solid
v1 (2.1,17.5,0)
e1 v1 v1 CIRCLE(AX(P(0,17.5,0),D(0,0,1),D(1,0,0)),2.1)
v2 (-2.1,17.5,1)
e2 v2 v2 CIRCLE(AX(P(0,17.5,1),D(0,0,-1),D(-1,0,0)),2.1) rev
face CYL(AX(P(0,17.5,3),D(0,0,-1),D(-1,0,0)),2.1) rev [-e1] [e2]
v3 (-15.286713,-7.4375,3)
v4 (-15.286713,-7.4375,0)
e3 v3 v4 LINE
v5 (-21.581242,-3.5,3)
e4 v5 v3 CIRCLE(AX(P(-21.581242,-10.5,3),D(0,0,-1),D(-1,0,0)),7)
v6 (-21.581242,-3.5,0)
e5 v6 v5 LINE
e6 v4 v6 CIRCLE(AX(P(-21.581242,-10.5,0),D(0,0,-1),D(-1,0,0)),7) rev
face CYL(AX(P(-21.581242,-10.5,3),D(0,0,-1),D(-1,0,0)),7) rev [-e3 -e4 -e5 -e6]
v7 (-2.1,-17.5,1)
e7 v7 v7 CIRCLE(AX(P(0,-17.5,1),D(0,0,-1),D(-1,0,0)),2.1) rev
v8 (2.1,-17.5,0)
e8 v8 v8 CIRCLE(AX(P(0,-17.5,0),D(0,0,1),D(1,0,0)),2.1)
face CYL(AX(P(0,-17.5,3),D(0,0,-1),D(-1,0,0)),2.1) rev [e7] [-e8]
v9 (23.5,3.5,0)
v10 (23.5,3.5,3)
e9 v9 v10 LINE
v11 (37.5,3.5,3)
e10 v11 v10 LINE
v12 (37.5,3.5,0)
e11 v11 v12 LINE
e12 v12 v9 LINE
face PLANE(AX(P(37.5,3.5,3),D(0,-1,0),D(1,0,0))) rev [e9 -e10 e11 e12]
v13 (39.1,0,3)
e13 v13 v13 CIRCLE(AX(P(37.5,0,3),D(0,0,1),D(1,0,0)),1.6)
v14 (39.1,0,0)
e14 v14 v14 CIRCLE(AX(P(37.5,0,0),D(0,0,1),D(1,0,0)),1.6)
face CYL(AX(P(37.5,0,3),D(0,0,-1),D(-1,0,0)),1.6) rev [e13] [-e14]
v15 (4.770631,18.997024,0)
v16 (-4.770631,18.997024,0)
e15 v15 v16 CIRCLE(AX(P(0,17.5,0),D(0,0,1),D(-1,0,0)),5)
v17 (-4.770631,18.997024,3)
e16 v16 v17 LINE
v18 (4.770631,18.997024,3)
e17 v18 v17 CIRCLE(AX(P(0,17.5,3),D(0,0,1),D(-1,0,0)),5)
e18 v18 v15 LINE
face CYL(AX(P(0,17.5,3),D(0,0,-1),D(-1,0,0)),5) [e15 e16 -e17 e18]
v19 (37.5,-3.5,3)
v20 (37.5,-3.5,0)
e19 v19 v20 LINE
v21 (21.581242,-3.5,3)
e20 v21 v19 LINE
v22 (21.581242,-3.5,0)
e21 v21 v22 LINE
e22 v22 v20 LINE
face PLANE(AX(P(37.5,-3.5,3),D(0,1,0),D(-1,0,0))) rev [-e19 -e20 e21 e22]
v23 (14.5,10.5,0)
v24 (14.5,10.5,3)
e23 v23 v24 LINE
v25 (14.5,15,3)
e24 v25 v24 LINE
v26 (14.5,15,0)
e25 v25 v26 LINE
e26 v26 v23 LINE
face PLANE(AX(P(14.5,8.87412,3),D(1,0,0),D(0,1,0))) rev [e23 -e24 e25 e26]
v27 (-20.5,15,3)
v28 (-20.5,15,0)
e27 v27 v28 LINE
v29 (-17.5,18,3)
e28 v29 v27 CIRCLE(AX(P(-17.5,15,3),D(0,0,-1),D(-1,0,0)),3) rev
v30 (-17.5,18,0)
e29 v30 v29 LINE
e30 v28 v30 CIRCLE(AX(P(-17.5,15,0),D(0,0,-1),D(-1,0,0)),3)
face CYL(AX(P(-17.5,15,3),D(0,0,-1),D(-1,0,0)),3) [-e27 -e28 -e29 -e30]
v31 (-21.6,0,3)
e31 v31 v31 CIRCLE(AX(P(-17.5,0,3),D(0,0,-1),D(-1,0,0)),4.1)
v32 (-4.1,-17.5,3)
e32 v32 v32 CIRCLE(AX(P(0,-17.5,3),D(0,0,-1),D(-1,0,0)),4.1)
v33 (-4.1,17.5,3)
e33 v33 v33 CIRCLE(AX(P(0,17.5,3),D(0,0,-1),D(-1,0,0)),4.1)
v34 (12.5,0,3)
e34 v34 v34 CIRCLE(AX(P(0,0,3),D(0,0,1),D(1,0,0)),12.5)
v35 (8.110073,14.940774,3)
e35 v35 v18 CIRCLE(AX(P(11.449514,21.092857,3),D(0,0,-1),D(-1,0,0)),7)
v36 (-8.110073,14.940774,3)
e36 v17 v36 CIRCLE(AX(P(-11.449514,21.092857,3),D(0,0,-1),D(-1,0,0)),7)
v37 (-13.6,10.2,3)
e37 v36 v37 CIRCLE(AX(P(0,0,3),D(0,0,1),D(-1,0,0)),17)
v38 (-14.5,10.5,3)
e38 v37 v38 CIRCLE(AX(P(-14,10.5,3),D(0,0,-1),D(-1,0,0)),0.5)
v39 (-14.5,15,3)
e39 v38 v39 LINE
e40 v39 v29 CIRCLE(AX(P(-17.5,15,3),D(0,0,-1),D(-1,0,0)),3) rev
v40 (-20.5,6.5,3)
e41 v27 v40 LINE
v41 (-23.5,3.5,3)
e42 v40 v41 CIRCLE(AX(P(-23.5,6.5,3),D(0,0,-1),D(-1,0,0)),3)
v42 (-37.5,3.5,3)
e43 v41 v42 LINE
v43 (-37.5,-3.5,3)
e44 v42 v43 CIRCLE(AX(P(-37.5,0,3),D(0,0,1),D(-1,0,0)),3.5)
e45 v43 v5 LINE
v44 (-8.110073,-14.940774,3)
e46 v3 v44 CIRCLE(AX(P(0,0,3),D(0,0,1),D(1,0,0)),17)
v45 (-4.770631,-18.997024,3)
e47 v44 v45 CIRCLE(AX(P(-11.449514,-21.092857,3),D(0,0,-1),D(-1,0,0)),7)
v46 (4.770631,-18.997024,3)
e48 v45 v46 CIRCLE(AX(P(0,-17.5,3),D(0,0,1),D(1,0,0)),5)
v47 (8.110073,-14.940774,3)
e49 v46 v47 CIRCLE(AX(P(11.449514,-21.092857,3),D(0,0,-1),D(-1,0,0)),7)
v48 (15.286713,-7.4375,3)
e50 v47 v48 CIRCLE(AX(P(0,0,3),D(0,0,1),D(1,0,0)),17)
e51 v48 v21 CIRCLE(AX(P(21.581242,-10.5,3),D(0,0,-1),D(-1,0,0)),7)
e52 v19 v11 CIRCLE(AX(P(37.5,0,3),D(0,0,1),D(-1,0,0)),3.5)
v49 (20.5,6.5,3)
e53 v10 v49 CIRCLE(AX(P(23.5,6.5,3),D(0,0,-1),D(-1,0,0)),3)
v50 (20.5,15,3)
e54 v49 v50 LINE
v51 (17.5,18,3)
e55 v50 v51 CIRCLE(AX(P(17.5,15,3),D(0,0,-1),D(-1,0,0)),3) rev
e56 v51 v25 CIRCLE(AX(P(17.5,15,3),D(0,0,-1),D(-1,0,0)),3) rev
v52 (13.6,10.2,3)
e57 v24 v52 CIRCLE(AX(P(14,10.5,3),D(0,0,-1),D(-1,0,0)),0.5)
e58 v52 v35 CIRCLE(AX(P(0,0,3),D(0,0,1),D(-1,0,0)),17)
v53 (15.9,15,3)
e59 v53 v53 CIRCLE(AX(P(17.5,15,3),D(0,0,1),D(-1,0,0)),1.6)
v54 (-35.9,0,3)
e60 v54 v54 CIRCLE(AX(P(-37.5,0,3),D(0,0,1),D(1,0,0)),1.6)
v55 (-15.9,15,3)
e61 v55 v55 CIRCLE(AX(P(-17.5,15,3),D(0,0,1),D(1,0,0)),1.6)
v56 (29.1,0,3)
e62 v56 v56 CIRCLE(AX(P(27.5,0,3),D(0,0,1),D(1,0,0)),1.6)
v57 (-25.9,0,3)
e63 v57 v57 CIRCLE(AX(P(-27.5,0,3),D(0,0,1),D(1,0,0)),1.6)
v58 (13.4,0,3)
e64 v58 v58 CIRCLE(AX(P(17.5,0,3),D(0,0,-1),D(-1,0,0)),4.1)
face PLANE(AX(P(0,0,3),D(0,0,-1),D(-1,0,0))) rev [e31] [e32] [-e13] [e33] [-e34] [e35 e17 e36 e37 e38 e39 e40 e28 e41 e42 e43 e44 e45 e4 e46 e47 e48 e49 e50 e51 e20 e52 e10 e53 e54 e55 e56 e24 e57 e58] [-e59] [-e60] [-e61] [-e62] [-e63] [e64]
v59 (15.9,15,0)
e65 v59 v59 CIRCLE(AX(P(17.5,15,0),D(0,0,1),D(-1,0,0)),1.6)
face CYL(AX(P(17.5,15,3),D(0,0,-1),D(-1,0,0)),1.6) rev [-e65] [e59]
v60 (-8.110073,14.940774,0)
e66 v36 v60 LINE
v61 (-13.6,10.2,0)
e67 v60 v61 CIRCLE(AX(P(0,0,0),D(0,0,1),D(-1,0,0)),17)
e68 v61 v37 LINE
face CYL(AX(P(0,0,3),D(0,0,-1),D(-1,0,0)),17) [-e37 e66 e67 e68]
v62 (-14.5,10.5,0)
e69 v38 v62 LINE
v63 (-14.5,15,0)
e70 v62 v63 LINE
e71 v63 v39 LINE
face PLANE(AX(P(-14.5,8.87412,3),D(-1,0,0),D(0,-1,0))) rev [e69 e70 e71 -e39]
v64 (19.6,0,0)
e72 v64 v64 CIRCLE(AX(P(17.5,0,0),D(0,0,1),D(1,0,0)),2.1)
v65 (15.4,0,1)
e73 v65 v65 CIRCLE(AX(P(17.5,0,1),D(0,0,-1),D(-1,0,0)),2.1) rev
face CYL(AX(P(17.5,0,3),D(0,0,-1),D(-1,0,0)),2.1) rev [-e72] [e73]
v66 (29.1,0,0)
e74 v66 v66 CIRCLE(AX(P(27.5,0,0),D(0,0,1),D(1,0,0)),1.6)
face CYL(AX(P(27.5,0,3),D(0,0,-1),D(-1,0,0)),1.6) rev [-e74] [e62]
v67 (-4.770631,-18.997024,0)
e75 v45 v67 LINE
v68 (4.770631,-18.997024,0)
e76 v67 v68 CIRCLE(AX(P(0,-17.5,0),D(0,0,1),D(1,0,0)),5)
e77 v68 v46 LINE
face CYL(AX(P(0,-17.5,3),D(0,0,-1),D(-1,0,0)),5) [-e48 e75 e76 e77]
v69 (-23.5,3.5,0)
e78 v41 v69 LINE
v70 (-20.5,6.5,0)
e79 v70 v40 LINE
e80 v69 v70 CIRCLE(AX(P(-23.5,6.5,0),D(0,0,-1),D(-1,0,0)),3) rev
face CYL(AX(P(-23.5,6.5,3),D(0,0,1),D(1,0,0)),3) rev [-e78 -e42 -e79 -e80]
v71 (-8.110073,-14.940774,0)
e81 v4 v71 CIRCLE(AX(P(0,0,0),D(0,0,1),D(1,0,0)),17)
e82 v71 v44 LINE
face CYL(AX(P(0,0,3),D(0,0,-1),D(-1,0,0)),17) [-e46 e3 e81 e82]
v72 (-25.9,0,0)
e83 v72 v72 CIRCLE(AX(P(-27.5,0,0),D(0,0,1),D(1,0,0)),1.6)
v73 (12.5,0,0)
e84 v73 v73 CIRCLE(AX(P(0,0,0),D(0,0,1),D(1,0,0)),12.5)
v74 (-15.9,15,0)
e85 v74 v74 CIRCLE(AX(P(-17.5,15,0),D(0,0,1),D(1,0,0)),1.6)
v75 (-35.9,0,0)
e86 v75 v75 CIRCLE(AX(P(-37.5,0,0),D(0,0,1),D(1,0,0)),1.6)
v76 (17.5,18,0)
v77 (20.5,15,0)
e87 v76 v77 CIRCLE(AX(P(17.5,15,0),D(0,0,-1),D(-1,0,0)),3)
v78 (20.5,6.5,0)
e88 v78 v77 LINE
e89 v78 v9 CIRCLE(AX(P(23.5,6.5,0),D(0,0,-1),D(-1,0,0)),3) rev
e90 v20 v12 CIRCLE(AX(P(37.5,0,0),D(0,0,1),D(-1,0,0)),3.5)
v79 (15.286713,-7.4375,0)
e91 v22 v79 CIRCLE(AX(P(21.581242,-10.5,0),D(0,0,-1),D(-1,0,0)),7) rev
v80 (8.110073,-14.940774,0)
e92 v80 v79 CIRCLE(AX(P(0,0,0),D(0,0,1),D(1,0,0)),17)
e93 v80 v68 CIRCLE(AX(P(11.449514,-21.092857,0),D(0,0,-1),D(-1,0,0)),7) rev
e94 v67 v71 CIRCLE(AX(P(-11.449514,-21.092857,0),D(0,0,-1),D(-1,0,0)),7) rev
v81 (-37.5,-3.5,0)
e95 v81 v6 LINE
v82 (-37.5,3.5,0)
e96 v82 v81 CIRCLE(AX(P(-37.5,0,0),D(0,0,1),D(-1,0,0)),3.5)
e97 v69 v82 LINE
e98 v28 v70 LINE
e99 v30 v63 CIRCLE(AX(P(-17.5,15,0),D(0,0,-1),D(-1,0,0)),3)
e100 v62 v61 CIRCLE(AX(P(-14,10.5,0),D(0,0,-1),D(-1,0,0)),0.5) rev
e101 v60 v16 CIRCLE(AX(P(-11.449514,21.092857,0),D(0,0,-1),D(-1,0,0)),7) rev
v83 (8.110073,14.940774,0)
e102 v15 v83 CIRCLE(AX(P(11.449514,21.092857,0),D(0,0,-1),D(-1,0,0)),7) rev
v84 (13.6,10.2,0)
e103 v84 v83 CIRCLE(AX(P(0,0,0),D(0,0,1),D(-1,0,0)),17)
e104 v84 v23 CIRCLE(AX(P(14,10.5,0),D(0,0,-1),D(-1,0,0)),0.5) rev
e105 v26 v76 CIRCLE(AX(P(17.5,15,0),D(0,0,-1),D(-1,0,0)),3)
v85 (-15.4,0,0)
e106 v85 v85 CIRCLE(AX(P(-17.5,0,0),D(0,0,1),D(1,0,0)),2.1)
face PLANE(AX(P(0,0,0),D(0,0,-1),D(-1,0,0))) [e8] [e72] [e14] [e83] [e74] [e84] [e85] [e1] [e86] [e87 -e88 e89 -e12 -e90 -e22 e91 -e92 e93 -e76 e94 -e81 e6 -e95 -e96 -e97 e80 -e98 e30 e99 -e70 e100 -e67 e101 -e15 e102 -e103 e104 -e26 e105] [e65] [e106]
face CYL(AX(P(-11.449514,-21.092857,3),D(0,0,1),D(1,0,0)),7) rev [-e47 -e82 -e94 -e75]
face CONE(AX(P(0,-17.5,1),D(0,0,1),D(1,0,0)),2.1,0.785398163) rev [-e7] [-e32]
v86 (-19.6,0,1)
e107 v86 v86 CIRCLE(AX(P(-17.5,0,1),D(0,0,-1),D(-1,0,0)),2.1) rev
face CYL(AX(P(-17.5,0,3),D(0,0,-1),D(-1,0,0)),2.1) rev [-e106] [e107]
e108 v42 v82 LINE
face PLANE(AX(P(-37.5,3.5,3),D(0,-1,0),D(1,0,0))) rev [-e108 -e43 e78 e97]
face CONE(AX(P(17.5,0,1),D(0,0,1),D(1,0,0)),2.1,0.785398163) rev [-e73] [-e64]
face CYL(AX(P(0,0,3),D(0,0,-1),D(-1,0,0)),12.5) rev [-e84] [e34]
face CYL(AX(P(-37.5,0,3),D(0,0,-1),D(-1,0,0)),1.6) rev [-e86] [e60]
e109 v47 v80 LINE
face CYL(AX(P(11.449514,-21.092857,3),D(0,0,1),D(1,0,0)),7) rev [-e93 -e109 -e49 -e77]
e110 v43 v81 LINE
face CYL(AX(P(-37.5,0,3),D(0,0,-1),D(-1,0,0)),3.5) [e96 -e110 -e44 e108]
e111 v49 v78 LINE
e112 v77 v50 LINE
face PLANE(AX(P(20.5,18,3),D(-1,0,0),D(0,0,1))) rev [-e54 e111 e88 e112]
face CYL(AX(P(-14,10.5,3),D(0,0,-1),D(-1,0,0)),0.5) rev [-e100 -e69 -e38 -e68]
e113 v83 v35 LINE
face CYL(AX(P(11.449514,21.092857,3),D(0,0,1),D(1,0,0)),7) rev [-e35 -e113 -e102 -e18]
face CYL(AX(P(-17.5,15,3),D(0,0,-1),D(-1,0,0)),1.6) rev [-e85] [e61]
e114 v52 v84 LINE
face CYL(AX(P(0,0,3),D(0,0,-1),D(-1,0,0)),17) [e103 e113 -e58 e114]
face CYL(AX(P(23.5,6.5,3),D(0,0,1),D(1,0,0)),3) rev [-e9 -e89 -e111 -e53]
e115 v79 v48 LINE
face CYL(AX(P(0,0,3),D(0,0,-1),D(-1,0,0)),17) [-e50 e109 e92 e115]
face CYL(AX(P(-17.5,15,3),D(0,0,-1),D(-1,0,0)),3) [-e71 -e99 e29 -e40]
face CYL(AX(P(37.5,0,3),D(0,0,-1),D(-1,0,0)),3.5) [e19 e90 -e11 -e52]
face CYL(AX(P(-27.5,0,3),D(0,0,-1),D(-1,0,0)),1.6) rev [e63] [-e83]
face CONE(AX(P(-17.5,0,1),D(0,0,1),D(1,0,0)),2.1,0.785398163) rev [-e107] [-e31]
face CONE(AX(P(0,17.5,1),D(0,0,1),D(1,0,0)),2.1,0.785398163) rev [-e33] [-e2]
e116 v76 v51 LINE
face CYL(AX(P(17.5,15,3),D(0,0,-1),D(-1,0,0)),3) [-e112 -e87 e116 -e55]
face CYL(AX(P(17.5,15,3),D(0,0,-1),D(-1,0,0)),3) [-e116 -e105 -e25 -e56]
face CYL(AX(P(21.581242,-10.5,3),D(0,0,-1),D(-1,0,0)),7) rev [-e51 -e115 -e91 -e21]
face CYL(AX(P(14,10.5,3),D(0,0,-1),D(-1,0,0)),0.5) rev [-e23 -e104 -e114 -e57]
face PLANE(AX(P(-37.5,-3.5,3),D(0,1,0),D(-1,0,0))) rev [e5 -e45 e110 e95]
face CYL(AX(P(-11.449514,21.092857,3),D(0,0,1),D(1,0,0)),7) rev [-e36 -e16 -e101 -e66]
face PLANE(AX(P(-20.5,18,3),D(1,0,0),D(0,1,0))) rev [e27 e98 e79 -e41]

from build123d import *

# Parameters (mm, degrees)
SKETCH_1_R      = 12.5
SKETCH_1_R_2    = 2.1
SKETCH_1_R_3    = 1.6
EXTRUDE_1_DEPTH = 3
FILLET_2_R      = 7
FILLET_3_R      = 3
FILLET_4_R      = 0.5
CHAMFER_1_SIZE  = 2


with BuildPart() as part:
    # ｽｹｯﾁ1 → ﾎﾞｽ - 押し出し1 (new body)
    with BuildSketch(Plane.XY):
        with BuildLine():
            Line((-37.5, -3.5), (-16.63580476, -3.5))
            ThreePointArc((-16.63580476, -3.5), (-12.503868825, -11.517519889), (-4.852092963, -16.292857143))
            ThreePointArc((-4.852092963, -16.292857143), (0, -22.5), (4.852092963, -16.292857143))
            ThreePointArc((4.852092963, -16.292857143), (12.503868825, -11.517519889), (16.63580476, -3.5))
            Line((16.63580476, -3.5), (37.5, -3.5))
            ThreePointArc((37.5, -3.5), (41, 0), (37.5, 3.5))
            Line((37.5, 3.5), (20.5, 3.5))
            Line((20.5, 3.5), (20.5, 18))
            Line((20.5, 18), (14.5, 18))
            Line((14.5, 18), (14.5, 8.874119675))
            ThreePointArc((14.5, 8.874119675), (10.362687485, 13.476450129), (4.852092963, 16.292857143))
            ThreePointArc((4.852092963, 16.292857143), (0, 22.5), (-4.852092963, 16.292857143))
            ThreePointArc((-4.852092963, 16.292857143), (-10.362687485, 13.476450129), (-14.5, 8.874119675))
            Line((-14.5, 8.874119675), (-14.5, 18))
            Line((-14.5, 18), (-20.5, 18))
            Line((-20.5, 18), (-20.5, 3.5))
            Line((-20.5, 3.5), (-37.5, 3.5))
            ThreePointArc((-37.5, 3.5), (-41, 0), (-37.5, -3.5))
        make_face()
        Circle(SKETCH_1_R, mode=Mode.SUBTRACT)
        with Locations((0, 17.5)):
            Circle(SKETCH_1_R_2, mode=Mode.SUBTRACT)
        with Locations((-17.5, 0)):
            Circle(SKETCH_1_R_2, mode=Mode.SUBTRACT)
        with Locations((0, -17.5)):
            Circle(SKETCH_1_R_2, mode=Mode.SUBTRACT)
        with Locations((17.5, 0)):
            Circle(SKETCH_1_R_2, mode=Mode.SUBTRACT)
        with Locations((-27.5, 0)):
            Circle(SKETCH_1_R_3, mode=Mode.SUBTRACT)
        with Locations((-37.5, 0)):
            Circle(SKETCH_1_R_3, mode=Mode.SUBTRACT)
        with Locations((27.5, 0)):
            Circle(SKETCH_1_R_3, mode=Mode.SUBTRACT)
        with Locations((37.5, 0)):
            Circle(SKETCH_1_R_3, mode=Mode.SUBTRACT)
        with Locations((-17.5, 15)):
            Circle(SKETCH_1_R_3, mode=Mode.SUBTRACT)
        with Locations(Location((17.5, 15, 0), (0, 0, 180))):
            Circle(SKETCH_1_R_3, mode=Mode.SUBTRACT)
    extrude(amount=EXTRUDE_1_DEPTH)

    # ﾌｨﾚｯﾄ2
    fillet_2_edges = [part.edges().sort_by_distance(p)[0] for p in [
        (-4.852092963, 16.292857143, 1.5),
        (4.852092963, 16.292857143, 1.5),
        (16.63580476, -3.5, 1.5),
        (4.852092963, -16.292857143, 1.5),
        (-4.852092963, -16.292857143, 1.5),
        (-16.63580476, -3.5, 1.5),
    ]]
    fillet(fillet_2_edges, radius=FILLET_2_R)

    # ﾌｨﾚｯﾄ3
    fillet_3_edges = [part.edges().sort_by_distance(p)[0] for p in [
        (20.5, 18, 1.5),
        (14.5, 18, 1.5),
        (20.5, 3.5, 1.5),
        (-14.5, 18, 1.5),
        (-20.5, 18, 1.5),
        (-20.5, 3.5, 1.5),
    ]]
    fillet(fillet_3_edges, radius=FILLET_3_R - 0.0001)  # a hair under: the kernel refuses the full size

    # ﾌｨﾚｯﾄ4
    fillet_4_edges = [part.edges().sort_by_distance(p)[0] for p in [
        (14.5, 8.874119675, 1.5),
        (-14.5, 8.874119675, 1.5),
    ]]
    fillet(fillet_4_edges, radius=FILLET_4_R)

    # 面取り1
    chamfer_1_edges = [part.edges().sort_by_distance(p)[0] for p in [
        (-2.1, 17.5, 3),
        (-19.6, 0, 3),
        (-2.1, -17.5, 3),
        (15.4, 0, 3),
    ]]
    chamfer(chamfer_1_edges, length=CHAMFER_1_SIZE)


solid = part.part
